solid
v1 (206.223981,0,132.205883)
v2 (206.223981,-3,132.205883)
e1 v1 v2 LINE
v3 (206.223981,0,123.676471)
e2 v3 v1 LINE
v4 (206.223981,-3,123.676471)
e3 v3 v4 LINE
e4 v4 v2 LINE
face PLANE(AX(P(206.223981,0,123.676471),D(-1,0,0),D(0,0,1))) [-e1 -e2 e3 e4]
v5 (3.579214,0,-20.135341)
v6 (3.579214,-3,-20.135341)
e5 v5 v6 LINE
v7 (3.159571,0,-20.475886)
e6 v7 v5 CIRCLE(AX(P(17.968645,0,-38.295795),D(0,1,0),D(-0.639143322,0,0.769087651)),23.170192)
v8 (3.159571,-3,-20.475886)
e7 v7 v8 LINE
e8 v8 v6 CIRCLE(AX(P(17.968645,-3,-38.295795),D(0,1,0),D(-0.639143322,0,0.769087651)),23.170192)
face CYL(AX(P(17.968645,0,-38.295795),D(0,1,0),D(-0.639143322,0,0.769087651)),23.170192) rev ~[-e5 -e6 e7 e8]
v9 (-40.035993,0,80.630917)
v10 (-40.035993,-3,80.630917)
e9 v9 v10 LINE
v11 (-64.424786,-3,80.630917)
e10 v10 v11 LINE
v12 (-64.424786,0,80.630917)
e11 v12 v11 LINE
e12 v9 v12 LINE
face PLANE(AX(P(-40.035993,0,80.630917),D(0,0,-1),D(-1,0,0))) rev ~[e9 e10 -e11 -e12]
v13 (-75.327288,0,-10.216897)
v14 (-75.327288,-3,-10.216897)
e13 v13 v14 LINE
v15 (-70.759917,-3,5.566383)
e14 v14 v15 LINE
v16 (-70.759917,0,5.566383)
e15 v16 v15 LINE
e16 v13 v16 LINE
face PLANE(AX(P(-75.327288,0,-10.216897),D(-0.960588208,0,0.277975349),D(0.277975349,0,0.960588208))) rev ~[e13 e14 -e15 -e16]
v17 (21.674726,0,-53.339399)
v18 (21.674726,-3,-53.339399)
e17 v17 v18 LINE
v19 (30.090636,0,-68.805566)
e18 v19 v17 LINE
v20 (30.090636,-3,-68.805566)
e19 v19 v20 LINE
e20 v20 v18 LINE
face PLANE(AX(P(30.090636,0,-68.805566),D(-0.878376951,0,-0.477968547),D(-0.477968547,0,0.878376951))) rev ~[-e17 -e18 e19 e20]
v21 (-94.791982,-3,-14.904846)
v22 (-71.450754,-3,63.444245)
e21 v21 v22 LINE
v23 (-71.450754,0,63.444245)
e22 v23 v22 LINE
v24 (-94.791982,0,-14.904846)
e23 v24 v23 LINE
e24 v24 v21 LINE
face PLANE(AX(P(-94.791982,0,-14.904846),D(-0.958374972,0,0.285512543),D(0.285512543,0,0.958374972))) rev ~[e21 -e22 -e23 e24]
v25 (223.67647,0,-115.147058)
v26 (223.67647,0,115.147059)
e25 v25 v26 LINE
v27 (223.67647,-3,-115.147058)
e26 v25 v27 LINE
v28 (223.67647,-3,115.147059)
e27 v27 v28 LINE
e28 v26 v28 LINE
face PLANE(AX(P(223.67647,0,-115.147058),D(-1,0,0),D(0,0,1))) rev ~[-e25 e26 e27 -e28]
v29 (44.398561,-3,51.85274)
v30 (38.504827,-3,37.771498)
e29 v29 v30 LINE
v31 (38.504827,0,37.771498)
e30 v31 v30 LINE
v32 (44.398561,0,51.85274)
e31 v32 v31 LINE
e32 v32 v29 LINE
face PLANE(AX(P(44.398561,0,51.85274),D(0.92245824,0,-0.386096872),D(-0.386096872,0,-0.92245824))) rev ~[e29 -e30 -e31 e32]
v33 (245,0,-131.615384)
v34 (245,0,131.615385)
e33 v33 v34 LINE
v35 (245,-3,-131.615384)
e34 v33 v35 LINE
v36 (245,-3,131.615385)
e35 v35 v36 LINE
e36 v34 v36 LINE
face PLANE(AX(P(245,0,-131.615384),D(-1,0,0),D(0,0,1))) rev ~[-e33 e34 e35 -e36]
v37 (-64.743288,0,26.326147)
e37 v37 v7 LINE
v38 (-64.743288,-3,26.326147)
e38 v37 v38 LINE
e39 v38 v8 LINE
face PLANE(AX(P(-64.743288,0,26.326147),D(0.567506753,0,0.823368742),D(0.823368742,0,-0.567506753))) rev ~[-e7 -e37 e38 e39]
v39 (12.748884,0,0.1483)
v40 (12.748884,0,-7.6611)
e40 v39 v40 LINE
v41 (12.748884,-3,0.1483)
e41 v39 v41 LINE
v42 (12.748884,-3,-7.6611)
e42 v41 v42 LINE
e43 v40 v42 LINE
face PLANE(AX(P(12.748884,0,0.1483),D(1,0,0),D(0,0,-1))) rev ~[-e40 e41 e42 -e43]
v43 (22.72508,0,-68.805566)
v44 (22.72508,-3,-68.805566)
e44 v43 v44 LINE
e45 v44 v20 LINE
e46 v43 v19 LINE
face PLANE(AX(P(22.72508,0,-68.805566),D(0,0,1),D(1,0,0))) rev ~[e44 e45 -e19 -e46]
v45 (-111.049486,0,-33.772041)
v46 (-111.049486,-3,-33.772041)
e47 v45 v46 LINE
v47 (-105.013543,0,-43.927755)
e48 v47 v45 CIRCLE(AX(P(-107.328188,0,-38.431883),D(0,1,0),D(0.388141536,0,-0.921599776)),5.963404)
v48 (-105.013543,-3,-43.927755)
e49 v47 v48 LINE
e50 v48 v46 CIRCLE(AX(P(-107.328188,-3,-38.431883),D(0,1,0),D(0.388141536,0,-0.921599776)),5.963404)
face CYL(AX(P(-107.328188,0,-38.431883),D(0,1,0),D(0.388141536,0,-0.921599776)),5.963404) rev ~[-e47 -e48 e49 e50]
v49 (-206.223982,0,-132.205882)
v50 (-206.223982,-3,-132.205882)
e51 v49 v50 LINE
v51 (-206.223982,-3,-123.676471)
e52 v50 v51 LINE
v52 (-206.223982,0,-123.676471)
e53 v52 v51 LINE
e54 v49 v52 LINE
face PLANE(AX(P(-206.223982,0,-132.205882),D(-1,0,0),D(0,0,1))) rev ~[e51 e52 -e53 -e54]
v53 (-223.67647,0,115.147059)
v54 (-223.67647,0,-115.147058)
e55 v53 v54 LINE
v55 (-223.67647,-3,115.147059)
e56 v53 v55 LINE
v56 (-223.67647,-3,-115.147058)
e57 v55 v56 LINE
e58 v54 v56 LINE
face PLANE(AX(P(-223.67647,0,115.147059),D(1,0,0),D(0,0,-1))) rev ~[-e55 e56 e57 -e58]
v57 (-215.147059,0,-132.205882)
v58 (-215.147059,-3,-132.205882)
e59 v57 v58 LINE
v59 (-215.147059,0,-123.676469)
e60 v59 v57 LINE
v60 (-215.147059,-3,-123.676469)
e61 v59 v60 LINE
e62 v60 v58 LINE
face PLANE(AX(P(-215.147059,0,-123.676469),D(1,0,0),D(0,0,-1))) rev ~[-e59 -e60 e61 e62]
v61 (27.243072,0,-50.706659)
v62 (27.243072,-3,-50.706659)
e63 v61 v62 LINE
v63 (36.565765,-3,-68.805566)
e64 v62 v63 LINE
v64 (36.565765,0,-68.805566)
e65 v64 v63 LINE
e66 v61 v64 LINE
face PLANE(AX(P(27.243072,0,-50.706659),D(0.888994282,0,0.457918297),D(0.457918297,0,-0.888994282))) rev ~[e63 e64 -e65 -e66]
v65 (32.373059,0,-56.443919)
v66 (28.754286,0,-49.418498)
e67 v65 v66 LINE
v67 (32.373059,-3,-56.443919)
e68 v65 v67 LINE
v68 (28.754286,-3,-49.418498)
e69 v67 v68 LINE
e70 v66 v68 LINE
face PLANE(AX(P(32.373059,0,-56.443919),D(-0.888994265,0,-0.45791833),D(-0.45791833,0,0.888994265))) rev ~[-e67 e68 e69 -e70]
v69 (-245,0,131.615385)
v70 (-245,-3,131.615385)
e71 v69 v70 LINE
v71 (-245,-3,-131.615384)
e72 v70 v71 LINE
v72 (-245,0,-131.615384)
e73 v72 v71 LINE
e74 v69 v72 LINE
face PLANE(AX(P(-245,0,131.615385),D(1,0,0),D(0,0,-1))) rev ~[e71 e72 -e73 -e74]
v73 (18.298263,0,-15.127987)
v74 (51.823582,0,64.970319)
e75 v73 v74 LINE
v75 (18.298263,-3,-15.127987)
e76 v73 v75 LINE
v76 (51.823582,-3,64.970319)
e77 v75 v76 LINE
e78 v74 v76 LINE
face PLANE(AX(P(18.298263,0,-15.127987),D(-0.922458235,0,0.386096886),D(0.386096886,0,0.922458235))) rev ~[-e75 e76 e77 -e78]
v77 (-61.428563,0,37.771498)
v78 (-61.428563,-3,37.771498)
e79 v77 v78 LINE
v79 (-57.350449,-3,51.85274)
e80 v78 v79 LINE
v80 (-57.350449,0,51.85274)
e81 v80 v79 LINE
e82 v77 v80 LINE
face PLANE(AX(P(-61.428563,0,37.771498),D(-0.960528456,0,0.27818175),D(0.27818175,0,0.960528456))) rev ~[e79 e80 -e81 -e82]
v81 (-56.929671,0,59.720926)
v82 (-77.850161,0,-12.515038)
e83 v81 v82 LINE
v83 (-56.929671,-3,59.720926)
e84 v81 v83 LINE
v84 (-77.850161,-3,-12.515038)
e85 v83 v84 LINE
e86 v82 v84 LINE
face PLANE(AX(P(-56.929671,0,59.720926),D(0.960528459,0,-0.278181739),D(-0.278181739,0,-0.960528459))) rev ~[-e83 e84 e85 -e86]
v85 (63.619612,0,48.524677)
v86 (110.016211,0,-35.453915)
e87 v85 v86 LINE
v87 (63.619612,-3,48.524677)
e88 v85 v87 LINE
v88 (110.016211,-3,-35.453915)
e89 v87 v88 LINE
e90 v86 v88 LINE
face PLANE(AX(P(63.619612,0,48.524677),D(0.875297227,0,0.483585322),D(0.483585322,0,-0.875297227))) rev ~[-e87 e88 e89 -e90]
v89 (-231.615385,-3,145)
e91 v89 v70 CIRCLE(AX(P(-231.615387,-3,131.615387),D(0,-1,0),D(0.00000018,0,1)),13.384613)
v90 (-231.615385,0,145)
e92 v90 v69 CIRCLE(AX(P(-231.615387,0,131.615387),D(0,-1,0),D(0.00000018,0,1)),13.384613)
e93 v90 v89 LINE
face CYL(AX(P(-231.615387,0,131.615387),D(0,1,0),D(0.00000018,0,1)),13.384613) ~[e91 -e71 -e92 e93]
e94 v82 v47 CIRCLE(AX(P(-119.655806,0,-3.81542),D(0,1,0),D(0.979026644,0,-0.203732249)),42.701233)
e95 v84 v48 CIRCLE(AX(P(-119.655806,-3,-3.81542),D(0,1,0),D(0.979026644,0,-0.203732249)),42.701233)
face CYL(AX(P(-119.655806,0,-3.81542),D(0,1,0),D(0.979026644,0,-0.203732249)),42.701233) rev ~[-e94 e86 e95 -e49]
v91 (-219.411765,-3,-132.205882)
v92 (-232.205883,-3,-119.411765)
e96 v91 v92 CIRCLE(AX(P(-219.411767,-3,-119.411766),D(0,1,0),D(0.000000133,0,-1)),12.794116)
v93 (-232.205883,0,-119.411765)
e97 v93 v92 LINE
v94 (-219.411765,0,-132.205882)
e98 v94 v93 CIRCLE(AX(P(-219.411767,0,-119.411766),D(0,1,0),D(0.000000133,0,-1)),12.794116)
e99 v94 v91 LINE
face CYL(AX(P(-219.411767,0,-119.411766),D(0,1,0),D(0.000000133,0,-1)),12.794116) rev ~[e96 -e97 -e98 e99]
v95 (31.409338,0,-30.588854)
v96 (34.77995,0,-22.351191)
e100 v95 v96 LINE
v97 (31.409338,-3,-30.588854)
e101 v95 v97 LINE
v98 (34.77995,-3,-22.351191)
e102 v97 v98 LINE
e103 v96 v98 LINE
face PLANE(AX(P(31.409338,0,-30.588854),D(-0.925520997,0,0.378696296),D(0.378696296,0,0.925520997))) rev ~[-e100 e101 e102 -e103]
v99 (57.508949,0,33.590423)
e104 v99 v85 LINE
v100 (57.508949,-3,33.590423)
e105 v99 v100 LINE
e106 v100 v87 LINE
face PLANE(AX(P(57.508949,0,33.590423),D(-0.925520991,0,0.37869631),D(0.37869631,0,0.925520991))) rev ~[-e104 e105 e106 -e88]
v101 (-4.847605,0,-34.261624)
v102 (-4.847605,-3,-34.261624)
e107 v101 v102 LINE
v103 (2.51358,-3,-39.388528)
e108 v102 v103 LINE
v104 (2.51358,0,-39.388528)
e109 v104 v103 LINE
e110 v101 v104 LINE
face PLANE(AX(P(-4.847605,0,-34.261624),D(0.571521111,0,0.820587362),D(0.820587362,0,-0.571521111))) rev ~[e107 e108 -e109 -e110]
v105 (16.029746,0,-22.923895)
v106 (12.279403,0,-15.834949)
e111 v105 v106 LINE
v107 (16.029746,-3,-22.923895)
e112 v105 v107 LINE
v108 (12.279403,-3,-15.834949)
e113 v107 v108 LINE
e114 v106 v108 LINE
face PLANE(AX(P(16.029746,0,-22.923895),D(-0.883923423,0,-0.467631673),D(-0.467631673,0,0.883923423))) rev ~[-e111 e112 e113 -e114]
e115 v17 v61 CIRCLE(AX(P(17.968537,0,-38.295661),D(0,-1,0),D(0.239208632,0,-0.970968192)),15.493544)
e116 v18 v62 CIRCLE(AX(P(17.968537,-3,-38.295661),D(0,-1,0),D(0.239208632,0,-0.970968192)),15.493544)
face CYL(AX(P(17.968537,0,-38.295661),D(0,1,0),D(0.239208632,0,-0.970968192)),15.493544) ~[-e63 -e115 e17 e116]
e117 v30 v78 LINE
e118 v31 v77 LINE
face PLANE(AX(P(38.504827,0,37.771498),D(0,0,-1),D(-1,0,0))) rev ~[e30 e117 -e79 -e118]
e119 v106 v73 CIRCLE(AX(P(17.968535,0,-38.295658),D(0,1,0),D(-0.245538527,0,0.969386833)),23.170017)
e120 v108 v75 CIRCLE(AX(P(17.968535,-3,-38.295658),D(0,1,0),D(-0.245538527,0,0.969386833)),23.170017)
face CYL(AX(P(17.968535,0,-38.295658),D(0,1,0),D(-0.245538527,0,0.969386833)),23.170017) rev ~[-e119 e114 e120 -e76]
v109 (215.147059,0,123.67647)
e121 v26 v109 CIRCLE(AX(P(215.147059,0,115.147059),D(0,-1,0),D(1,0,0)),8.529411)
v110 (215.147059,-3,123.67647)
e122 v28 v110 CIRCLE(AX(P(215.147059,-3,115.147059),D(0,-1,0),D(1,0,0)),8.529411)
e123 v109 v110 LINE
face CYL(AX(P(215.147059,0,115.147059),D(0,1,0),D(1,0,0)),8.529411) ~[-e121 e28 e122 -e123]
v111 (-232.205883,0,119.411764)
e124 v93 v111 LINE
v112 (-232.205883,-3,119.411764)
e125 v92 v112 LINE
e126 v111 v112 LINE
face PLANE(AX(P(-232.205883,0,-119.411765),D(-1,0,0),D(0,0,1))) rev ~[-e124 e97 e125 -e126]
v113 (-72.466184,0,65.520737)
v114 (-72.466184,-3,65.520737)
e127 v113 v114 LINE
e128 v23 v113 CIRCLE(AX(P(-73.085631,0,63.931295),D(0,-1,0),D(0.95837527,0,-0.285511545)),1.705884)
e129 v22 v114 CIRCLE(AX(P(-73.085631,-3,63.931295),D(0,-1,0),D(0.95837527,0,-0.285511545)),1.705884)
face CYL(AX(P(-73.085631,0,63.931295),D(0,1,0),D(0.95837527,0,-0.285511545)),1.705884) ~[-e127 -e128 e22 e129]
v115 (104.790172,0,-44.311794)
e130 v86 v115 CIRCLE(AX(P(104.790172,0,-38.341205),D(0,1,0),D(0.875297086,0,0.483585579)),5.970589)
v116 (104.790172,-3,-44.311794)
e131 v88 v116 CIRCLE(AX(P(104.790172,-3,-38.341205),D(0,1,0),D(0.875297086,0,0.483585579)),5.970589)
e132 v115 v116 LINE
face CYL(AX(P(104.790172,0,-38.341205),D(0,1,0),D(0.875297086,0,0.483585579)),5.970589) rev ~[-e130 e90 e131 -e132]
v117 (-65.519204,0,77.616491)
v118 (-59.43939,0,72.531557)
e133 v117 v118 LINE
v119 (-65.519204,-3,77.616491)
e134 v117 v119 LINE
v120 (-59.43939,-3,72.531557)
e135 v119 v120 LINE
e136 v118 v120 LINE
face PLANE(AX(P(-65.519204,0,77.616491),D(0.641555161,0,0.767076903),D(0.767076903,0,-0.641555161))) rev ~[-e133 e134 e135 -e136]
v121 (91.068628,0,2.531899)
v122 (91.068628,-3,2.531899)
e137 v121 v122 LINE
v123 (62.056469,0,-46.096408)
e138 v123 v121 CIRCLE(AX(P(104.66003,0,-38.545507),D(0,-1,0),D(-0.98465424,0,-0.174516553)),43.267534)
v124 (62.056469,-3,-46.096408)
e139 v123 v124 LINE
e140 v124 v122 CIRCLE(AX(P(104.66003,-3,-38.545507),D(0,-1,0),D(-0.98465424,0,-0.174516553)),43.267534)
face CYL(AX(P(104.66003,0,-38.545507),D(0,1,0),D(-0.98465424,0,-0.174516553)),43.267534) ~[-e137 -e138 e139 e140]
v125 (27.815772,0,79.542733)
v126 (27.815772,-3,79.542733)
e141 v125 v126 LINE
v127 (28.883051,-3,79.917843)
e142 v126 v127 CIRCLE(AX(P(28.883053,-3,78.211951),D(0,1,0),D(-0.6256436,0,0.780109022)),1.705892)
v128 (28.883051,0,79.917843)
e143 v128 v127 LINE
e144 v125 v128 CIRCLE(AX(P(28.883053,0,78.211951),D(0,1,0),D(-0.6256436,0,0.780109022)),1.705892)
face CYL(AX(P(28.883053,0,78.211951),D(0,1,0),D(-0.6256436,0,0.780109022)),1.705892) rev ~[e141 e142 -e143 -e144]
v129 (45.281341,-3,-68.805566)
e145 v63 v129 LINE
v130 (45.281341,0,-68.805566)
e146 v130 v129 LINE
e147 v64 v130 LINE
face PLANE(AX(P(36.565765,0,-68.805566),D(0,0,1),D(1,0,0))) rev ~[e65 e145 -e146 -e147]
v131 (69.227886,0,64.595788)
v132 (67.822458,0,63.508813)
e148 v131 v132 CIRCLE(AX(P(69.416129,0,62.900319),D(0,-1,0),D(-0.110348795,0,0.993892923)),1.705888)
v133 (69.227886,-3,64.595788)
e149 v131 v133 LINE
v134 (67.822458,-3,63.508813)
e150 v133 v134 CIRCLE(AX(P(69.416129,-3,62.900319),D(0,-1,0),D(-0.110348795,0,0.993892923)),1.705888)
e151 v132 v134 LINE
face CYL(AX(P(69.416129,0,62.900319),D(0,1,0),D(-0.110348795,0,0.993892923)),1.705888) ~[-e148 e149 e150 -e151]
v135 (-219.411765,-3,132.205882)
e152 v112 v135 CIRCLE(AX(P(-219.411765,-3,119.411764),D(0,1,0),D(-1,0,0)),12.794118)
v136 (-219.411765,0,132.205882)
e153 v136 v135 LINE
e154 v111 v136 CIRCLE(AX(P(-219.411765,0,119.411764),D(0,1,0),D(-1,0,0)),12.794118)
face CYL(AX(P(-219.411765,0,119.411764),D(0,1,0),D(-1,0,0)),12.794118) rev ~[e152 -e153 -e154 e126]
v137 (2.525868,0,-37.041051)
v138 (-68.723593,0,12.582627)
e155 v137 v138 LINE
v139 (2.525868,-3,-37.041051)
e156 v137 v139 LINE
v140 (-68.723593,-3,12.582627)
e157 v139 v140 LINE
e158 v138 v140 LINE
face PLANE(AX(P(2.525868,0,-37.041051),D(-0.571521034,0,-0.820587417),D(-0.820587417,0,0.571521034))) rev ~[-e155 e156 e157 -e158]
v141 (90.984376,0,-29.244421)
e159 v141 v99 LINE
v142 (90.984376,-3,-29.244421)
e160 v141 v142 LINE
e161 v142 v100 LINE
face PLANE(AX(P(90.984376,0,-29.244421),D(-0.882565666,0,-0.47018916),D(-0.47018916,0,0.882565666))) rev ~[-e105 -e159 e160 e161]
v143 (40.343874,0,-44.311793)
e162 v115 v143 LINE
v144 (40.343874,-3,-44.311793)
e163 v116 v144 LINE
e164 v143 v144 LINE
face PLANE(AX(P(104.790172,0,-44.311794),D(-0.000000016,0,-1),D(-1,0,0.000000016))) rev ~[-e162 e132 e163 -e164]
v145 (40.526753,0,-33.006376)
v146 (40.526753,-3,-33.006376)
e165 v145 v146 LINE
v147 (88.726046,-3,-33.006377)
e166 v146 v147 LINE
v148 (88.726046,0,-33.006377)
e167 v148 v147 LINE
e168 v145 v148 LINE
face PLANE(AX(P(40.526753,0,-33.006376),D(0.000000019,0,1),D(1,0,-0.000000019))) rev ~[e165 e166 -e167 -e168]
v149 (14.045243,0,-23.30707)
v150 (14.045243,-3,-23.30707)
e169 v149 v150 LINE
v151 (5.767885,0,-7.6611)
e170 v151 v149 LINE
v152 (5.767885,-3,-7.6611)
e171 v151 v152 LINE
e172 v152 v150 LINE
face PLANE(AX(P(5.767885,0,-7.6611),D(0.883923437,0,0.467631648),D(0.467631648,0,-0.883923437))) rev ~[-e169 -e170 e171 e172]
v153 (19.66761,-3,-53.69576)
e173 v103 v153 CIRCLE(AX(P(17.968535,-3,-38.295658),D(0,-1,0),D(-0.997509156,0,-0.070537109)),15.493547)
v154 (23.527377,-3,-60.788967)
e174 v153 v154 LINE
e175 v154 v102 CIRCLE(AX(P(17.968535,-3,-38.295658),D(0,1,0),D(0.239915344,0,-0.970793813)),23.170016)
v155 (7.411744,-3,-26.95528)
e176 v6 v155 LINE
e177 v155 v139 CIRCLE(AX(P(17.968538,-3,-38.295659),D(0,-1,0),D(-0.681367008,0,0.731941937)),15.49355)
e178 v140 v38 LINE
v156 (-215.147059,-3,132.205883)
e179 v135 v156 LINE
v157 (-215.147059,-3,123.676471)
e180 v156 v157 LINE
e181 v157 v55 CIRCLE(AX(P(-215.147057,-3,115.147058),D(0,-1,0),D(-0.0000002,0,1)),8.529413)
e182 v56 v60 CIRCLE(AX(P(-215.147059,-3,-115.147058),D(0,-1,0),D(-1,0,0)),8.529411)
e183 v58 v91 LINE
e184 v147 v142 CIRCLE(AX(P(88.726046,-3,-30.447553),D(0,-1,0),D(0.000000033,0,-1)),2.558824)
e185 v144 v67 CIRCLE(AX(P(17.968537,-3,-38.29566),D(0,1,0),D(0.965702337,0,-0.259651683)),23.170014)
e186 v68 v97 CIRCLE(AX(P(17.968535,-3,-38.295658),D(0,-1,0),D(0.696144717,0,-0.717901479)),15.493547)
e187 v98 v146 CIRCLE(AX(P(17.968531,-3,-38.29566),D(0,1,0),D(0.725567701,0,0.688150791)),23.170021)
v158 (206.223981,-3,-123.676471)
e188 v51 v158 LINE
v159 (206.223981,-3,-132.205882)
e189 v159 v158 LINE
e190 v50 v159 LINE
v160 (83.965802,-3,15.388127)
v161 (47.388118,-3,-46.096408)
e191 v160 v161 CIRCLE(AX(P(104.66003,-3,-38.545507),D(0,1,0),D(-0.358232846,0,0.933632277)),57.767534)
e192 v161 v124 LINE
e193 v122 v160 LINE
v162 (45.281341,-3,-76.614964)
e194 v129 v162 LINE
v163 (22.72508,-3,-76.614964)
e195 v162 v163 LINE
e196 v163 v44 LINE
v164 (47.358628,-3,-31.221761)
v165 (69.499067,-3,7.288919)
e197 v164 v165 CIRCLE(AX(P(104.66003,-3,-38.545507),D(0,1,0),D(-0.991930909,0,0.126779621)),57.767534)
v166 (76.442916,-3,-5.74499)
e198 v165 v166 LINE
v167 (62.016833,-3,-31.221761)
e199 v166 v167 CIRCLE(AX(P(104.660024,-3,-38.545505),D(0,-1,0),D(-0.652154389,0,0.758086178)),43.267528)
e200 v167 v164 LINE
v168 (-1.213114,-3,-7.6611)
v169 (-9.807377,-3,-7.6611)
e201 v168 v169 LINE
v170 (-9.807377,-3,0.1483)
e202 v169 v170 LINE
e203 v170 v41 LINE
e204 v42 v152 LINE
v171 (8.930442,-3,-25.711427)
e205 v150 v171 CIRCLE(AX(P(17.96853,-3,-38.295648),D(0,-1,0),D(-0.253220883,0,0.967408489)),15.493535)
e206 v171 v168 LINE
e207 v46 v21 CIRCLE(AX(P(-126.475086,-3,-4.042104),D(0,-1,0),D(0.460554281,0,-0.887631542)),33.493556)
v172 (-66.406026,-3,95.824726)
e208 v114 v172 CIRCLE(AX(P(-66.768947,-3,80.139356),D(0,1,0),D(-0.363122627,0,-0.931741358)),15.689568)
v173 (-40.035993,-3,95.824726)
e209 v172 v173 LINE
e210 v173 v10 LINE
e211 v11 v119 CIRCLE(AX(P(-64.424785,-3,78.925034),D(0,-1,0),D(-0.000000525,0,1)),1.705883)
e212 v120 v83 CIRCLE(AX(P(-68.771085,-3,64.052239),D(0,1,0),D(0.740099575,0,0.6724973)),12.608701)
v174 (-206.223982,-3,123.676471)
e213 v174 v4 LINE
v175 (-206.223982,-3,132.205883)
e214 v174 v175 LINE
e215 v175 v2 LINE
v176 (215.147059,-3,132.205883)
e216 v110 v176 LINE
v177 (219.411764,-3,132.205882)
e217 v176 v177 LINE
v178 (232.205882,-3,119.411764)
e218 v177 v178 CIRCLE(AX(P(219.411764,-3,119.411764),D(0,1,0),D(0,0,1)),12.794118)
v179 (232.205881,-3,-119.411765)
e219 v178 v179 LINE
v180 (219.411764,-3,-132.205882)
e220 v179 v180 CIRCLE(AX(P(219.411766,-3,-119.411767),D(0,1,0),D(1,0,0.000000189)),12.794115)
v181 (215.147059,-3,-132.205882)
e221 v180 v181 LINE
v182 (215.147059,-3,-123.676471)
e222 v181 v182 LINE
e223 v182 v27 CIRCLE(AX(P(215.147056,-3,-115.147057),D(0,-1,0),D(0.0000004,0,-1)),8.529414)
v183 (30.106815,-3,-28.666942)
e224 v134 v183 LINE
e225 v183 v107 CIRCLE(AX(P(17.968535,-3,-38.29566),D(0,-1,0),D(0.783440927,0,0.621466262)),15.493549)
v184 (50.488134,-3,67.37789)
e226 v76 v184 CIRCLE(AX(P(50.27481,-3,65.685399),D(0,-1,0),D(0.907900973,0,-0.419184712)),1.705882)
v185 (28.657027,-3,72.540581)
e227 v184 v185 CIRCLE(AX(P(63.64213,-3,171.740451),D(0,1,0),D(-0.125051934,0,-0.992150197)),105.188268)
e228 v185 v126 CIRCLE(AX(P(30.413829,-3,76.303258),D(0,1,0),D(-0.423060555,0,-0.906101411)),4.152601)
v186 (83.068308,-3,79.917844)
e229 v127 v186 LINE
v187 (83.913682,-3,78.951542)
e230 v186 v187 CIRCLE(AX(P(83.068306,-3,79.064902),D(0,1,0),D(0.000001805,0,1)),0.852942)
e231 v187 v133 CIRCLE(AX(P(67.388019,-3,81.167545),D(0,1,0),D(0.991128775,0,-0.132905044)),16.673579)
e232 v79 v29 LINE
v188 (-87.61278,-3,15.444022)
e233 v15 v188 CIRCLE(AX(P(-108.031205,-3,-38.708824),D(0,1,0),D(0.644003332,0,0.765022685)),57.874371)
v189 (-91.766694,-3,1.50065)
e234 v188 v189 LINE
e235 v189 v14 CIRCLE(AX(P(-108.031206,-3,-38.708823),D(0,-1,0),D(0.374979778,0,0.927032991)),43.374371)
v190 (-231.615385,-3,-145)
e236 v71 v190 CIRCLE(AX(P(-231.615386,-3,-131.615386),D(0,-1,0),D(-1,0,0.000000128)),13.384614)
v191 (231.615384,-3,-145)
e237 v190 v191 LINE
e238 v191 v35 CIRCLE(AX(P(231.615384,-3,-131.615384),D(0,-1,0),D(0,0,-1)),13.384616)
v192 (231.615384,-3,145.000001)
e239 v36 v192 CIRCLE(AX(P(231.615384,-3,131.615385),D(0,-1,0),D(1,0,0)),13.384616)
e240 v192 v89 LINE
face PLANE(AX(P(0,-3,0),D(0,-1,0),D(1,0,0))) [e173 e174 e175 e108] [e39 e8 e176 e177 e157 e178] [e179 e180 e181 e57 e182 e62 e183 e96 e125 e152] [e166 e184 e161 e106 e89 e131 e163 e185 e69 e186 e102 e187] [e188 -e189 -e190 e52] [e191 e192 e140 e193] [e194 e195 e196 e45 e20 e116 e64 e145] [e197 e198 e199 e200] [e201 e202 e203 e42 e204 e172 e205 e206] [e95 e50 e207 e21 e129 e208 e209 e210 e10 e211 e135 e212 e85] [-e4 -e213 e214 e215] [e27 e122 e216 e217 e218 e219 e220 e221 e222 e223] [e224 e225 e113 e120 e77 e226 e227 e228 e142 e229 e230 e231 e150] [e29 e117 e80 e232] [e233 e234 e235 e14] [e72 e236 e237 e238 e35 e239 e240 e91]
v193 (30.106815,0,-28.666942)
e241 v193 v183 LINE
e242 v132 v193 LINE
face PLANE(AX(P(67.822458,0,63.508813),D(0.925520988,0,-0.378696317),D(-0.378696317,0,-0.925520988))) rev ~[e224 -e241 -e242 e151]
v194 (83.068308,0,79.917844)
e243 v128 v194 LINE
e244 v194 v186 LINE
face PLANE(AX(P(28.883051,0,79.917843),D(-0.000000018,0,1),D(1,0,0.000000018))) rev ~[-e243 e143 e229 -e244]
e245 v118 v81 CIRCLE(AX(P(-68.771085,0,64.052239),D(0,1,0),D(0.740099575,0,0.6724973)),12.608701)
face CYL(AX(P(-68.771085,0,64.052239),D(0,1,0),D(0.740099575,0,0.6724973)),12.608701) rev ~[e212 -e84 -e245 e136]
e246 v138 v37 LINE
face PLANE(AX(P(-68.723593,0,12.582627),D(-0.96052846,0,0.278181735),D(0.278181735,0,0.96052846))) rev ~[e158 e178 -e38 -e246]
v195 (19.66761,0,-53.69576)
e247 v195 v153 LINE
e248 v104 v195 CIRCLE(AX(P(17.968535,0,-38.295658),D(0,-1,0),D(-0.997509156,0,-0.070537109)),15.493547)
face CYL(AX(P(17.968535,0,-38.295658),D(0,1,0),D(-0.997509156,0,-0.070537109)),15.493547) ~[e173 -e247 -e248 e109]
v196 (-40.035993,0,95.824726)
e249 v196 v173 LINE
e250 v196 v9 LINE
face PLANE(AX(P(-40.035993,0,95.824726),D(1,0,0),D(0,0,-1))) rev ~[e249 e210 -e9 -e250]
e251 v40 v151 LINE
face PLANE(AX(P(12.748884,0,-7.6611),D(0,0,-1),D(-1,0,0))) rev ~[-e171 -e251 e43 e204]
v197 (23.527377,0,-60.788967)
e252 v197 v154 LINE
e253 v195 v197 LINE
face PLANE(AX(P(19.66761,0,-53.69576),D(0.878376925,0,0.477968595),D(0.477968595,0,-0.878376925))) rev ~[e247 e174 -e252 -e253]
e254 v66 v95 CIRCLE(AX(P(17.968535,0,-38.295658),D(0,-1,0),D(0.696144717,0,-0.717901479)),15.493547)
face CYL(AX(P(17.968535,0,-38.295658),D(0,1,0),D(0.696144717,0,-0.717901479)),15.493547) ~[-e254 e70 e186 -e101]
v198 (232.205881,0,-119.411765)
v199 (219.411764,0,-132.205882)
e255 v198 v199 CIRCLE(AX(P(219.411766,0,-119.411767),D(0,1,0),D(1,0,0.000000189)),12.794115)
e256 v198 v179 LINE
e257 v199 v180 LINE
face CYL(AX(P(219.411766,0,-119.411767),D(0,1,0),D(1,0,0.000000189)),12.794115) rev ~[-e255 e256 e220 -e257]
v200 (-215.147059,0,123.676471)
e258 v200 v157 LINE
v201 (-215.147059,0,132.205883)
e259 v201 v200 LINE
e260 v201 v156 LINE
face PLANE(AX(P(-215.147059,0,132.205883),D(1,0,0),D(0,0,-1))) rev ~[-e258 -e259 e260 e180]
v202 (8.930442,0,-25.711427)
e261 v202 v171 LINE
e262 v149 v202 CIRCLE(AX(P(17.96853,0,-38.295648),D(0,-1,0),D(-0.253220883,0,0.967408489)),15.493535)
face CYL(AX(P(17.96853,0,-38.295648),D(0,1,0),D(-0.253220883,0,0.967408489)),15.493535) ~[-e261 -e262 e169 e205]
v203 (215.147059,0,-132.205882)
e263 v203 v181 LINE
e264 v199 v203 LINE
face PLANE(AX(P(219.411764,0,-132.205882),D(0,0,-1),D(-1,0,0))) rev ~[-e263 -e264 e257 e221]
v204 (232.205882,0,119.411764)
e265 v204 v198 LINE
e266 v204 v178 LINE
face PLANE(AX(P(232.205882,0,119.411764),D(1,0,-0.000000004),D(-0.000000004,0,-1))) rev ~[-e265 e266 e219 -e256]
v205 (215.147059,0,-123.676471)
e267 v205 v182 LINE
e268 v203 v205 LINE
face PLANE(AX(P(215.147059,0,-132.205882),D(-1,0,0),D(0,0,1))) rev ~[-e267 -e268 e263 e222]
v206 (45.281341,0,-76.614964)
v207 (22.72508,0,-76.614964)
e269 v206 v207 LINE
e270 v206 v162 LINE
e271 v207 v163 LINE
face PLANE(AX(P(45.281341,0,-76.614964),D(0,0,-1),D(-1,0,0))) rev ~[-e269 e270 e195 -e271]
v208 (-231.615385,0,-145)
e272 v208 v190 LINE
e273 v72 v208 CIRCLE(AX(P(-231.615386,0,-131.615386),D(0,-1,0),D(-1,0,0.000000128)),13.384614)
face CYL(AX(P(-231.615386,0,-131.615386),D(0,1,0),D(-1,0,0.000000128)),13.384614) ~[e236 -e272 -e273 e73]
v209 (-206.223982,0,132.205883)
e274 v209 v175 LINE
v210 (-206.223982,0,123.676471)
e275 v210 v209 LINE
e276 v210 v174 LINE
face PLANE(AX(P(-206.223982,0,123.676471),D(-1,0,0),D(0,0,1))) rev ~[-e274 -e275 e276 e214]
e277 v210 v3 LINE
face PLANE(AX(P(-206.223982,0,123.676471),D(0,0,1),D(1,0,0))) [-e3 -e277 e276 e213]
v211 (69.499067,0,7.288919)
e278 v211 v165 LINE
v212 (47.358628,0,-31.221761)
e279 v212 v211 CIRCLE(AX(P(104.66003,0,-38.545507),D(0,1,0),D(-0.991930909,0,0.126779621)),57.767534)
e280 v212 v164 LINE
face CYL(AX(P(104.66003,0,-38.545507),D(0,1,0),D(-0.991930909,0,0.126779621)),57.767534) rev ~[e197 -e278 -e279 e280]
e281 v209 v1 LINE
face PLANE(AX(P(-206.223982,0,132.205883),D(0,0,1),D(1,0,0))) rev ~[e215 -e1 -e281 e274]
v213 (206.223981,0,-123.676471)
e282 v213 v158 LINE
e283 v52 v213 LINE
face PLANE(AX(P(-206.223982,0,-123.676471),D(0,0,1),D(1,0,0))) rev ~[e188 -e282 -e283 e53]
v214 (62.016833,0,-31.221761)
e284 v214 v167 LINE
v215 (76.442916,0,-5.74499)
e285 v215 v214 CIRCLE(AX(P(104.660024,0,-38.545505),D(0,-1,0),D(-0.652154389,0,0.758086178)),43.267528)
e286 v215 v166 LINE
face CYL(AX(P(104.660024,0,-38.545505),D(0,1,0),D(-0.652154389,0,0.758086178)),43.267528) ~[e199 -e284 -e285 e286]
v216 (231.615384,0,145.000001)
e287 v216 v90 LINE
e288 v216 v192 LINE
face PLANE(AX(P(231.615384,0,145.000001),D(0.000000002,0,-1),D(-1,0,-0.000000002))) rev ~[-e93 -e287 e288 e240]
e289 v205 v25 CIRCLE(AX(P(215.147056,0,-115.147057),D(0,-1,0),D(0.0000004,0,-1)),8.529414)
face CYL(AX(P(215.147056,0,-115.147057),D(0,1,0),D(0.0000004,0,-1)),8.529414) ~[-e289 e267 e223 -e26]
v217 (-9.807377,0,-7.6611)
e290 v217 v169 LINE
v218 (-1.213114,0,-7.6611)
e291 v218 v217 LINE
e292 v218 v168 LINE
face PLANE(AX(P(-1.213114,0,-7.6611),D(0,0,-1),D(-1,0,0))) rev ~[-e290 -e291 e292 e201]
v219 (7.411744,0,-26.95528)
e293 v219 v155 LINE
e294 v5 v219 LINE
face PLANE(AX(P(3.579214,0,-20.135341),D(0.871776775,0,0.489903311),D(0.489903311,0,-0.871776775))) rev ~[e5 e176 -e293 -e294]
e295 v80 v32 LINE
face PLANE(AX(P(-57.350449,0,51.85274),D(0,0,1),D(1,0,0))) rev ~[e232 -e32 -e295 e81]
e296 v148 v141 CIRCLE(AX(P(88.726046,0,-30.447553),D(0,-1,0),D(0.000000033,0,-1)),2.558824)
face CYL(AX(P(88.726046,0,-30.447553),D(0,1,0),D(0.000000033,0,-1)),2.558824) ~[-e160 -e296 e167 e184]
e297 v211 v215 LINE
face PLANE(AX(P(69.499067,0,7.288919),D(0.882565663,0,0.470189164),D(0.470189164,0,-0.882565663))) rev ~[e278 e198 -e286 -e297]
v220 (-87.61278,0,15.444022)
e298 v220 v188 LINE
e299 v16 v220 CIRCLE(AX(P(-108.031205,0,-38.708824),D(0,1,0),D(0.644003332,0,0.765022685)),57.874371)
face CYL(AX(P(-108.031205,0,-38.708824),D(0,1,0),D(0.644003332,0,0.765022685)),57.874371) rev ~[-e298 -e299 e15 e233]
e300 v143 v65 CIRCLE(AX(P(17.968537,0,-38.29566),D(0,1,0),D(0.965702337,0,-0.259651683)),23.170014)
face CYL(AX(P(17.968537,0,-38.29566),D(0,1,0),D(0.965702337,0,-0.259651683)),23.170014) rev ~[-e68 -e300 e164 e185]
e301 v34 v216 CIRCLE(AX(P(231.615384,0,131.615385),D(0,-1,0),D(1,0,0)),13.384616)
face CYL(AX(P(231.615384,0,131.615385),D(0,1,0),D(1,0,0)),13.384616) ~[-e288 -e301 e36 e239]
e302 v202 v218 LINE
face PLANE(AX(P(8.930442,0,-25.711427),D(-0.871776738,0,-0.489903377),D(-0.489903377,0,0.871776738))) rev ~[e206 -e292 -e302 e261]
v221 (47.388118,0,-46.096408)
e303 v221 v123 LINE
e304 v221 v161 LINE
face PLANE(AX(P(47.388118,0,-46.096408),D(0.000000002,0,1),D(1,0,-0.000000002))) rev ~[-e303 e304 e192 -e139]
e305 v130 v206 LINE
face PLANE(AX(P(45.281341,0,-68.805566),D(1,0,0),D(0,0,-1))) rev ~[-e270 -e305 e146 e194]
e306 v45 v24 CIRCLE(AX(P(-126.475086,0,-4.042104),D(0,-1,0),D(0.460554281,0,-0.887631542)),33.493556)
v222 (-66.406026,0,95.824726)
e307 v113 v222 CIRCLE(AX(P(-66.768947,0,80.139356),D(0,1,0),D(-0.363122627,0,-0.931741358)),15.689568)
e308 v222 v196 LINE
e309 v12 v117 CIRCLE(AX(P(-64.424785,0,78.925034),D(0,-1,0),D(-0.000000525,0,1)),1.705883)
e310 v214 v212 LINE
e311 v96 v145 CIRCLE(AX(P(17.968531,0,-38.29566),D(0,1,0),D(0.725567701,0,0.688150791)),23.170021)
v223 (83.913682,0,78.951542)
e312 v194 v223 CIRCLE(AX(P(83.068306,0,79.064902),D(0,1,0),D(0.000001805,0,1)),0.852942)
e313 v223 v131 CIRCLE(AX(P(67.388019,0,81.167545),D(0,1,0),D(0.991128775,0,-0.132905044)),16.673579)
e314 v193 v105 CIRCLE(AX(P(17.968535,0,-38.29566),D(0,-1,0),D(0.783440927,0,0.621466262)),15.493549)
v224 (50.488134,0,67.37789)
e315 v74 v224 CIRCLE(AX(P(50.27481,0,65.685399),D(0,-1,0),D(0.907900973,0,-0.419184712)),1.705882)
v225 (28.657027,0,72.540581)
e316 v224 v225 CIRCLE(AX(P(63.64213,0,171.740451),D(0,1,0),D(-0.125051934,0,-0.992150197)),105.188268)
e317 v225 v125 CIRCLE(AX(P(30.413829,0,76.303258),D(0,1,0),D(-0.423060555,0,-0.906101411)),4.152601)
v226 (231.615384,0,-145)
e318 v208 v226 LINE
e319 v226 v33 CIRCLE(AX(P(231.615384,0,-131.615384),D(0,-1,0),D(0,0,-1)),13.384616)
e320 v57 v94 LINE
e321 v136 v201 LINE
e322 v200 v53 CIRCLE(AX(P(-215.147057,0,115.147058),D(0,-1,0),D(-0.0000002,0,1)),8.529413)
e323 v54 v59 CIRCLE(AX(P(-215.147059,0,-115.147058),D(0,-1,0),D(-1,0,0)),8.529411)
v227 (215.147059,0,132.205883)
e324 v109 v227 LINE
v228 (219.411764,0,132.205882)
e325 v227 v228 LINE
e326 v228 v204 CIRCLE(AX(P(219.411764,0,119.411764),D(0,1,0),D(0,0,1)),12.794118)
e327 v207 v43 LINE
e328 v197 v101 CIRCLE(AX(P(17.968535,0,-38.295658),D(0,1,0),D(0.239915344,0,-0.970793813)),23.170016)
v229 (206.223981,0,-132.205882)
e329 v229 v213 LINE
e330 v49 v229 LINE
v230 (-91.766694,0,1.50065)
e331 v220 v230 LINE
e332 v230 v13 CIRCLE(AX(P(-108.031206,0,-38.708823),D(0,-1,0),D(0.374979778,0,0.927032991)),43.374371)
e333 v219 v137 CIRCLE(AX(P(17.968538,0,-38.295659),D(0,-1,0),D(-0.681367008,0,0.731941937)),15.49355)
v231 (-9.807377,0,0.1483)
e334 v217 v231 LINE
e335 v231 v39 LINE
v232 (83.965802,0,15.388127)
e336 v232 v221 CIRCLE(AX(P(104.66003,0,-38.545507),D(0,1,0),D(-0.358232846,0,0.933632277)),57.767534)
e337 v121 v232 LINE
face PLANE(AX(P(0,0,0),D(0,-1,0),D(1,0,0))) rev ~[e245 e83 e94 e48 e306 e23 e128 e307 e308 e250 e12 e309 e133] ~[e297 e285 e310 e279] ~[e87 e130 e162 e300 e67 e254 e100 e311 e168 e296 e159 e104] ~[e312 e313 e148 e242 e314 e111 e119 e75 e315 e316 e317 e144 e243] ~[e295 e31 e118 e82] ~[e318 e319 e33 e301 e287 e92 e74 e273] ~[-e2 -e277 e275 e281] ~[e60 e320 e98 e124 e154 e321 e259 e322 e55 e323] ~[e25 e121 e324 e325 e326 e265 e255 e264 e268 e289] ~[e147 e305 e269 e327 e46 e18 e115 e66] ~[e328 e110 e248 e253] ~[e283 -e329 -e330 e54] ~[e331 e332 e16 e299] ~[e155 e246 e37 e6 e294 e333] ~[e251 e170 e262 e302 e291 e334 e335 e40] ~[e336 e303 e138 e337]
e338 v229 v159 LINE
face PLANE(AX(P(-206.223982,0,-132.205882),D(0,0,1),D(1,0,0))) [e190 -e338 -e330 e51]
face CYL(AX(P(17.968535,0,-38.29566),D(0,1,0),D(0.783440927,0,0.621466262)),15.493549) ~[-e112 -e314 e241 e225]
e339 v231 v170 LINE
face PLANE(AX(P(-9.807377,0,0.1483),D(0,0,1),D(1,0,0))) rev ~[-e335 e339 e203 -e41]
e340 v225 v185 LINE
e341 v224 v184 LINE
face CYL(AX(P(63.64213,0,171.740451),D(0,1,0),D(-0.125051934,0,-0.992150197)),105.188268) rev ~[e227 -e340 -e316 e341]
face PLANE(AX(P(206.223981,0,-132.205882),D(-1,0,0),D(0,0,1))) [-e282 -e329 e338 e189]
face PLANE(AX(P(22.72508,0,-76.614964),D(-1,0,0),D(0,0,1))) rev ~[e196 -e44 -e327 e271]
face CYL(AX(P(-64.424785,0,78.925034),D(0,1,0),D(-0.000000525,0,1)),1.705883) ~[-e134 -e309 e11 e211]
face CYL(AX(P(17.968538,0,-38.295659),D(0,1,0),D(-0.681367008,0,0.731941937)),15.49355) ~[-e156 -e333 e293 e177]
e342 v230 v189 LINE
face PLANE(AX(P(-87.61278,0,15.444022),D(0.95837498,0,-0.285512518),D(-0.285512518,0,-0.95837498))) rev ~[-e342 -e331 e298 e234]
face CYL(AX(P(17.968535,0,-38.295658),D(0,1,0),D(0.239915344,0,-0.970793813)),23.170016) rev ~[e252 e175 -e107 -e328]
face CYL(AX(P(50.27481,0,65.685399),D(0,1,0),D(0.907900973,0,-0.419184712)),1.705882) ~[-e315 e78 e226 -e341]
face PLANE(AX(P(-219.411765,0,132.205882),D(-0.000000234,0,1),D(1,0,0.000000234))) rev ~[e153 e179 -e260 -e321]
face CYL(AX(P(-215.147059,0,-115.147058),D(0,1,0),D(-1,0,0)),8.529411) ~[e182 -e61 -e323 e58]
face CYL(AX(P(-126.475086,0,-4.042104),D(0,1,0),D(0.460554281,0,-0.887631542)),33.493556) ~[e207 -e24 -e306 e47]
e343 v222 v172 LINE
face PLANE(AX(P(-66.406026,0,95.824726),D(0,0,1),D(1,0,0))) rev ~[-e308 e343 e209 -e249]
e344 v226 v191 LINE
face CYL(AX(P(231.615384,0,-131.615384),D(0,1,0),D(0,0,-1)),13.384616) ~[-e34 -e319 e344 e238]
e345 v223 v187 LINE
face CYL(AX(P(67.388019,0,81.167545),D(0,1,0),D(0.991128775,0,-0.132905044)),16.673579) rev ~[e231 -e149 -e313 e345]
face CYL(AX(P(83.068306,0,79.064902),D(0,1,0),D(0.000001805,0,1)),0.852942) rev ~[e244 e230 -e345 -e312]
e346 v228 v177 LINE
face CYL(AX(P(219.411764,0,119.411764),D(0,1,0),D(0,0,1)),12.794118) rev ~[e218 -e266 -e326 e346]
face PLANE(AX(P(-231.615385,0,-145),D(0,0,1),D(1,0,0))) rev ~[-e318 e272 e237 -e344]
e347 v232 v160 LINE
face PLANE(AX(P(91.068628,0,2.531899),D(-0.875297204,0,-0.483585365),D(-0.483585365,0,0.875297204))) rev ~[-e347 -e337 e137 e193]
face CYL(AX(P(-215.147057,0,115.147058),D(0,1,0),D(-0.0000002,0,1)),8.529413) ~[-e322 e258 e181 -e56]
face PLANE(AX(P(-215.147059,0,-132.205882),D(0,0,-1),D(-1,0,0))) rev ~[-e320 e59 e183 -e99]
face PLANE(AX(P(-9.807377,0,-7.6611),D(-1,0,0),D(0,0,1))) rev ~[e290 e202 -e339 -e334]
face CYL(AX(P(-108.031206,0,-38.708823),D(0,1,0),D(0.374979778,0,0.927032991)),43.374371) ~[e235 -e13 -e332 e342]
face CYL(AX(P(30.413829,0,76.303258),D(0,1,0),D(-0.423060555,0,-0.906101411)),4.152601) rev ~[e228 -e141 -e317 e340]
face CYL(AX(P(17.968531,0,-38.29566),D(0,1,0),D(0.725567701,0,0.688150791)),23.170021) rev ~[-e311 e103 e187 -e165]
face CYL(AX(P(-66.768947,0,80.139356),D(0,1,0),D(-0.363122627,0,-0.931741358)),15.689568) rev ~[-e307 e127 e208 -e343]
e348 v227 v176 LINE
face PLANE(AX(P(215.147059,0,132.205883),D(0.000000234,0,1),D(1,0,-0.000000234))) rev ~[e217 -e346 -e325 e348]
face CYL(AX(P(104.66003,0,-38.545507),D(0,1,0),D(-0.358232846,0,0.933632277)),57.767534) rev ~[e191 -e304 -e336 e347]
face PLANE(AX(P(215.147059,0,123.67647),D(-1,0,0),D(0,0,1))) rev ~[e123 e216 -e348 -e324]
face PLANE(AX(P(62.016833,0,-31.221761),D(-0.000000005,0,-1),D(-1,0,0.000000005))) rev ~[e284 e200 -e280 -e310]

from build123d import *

# Parameters (mm, degrees)
F0_W     = 412.447963
F0_H     = 8.529411
F0_H_2   = 8.529412
F1_DEPTH = 3


# Not quite as in the source:
# - ends of sketch curves that miss each other by under 0.0002 mm in the source are joined


with BuildPart() as f1:
    # F0 (on Front) → F1 (new body)
    with BuildSketch(Plane.XZ):
        with BuildLine():
            Line((-245, 131.615385), (-245, -131.615384))
            ThreePointArc((-245, -131.615384), (-241.0797377372, -141.0797367372), (-231.615385, -145))
            Line((-231.615385, -145), (231.615384, -145))
            ThreePointArc((231.615384, -145), (241.0797367372, -141.0797367372), (245, -131.615384))
            Line((245, -131.615384), (245, 131.615385))
            ThreePointArc((245, 131.615385), (241.0797367372, 141.0797377372), (231.615384, 145.000001))
            Line((231.615384, 145.000001), (-231.615385, 145))
            ThreePointArc((-231.615385, 145), (-241.0797377372, 141.0797377372), (-245, 131.615385))
        make_face()
        with BuildLine():
            ThreePointArc((-223.67647, -115.147058), (-221.1782633576, -121.1782623576), (-215.147059, -123.676469))
            Line((-215.147059, -123.676469), (-215.147059, -132.205882))
            Line((-215.147059, -132.205882), (-219.411765, -132.205882))
            ThreePointArc((-219.411765, -132.205882), (-228.4585725971, -128.4585725971), (-232.205883, -119.411765))
            Line((-232.205883, -119.411765), (-232.205883, 119.411764))
            ThreePointArc((-232.205883, 119.411764), (-228.4585725971, 128.4585715971), (-219.411765, 132.205882))
            Line((-219.411765, 132.205882), (-215.147059, 132.205883))
            Line((-215.147059, 132.205883), (-215.147059, 123.676471))
            ThreePointArc((-215.147059, 123.676471), (-221.1782633576, 121.1782633576), (-223.67647, 115.147059))
            Line((-223.67647, 115.147059), (-223.67647, -115.147058))
        make_face(mode=Mode.SUBTRACT)
        with BuildLine():
            ThreePointArc((-70.7599172527, 5.5663826998), (-137.2958198093, -88.6390266704), (-87.6127799718, 15.4440220749))
            Line((-87.6127799718, 15.4440220749), (-91.766694, 1.50065))
            ThreePointArc((-91.766694, 1.50065), (-133.2066284732, -74.0292729296), (-75.3272882753, -10.2168972398))
            Line((-75.3272882753, -10.2168972398), (-70.7599172527, 5.5663826998))
        make_face(mode=Mode.SUBTRACT)
        with BuildLine():
            Line((-68.723593, 12.582627), (-64.743288, 26.326147))
            Line((-64.743288, 26.326147), (3.159571, -20.475886))
            ThreePointArc((3.159571, -20.475886), (3.3683994767, -20.3043898267), (3.5792137936, -20.1353407395))
            Line((3.5792137936, -20.1353407395), (7.411744, -26.95528))
            ThreePointArc((7.411744, -26.95528), (4.0249471652, -31.5409295129), (2.5258681402, -37.0410509302))
            Line((2.5258681402, -37.0410509302), (-68.723593, 12.582627))
        make_face(mode=Mode.SUBTRACT)
        with Locations((-5e-07, -127.9411765)):
            Rectangle(F0_W, F0_H, mode=Mode.SUBTRACT)
        with BuildLine():
            Line((22.72508, -68.805566), (30.090636, -68.805566))
            Line((30.090636, -68.805566), (21.674726, -53.339399))
            ThreePointArc((21.674726, -53.339399), (24.591046355, -52.3025256725), (27.243072314, -50.7066594202))
            Line((27.243072314, -50.7066594202), (36.565765, -68.805566))
            Line((36.565765, -68.805566), (45.281341, -68.805566))
            Line((45.281341, -68.805566), (45.281341, -76.614964))
            Line((45.281341, -76.614964), (22.72508, -76.614964))
            Line((22.72508, -76.614964), (22.72508, -68.805566))
        make_face(mode=Mode.SUBTRACT)
        with BuildLine():
            Line((-4.847605, -34.261624), (2.51358, -39.388528))
            ThreePointArc((2.51358, -39.388528), (8.0448119147, -50.1939653909), (19.6676101132, -53.6957600257))
            Line((19.6676101132, -53.6957600257), (23.527377, -60.788967))
            ThreePointArc((23.527377, -60.788967), (2.1451797481, -55.2211156409), (-4.847605, -34.261624))
        make_face(mode=Mode.SUBTRACT)
        with BuildLine():
            ThreePointArc((83.96580189, 15.3881272867), (154.3064474066, -68.0805916135), (47.3881182197, -46.096407971))
            Line((47.3881182197, -46.096407971), (62.056469, -46.096408))
            ThreePointArc((62.056469, -46.096408), (141.8170821306, -60.7137946065), (91.0686279767, 2.5318990705))
            Line((91.0686279767, 2.5318990705), (83.96580189, 15.3881272867))
        make_face(mode=Mode.SUBTRACT)
        with BuildLine():
            Line((8.930442, -25.711427), (-1.213114, -7.6611))
            Line((-1.213114, -7.6611), (-9.807377, -7.6611))
            Line((-9.807377, -7.6611), (-9.807377, 0.1483))
            Line((-9.807377, 0.1483), (12.748884, 0.1483))
            Line((12.748884, 0.1483), (12.748884, -7.6611))
            Line((12.748884, -7.6611), (5.767885, -7.6611))
            Line((5.767885, -7.6611), (14.045243, -23.30707))
            ThreePointArc((14.045243, -23.30707), (11.3772825006, -24.2740536292), (8.930442, -25.711427))
        make_face(mode=Mode.SUBTRACT)
        with BuildLine():
            ThreePointArc((47.3586275037, -31.2217609366), (54.5791913728, -9.7531888086), (69.4990666913, 7.2889194025))
            Line((69.4990666913, 7.2889194025), (76.442916, -5.74499))
            ThreePointArc((76.442916, -5.74499), (67.0095000702, -17.2261004781), (62.0168330844, -31.2217610145))
            Line((62.0168330844, -31.2217610145), (47.3586275037, -31.2217609366))
        make_face(mode=Mode.SUBTRACT)
        with BuildLine():
            Line((90.984376, -29.244421), (57.508949, 33.590423))
            Line((57.508949, 33.590423), (63.619612, 48.524677))
            Line((63.619612, 48.524677), (110.016211, -35.453915))
            ThreePointArc((110.016211, -35.453915), (109.9324845309, -41.3751059281), (104.790172, -44.311794))
            Line((104.790172, -44.311794), (40.343874, -44.311793))
            ThreePointArc((40.343874, -44.311793), (37.3331086152, -51.0181961304), (32.3730594707, -56.443918593))
            Line((32.3730594707, -56.443918593), (28.754286, -49.418498))
            ThreePointArc((28.754286, -49.418498), (33.3103193803, -40.4589080248), (31.409337593, -30.5888542334))
            Line((31.409337593, -30.5888542334), (34.77995, -22.351191))
            ThreePointArc((34.77995, -22.351191), (38.3615541693, -27.2968191094), (40.5267526716, -33.006376077))
            Line((40.5267526716, -33.006376077), (88.726046, -33.006377))
            ThreePointArc((88.726046, -33.006377), (90.9199219225, -31.7645528859), (90.984376, -29.244421))
        make_face(mode=Mode.SUBTRACT)
        with BuildLine():
            Line((219.411764, -132.205882), (215.147059, -132.205882))
            Line((215.147059, -132.205882), (215.147059, -123.676471))
            ThreePointArc((215.147059, -123.676471), (221.1782633576, -121.1782623576), (223.67647, -115.147058))
            Line((223.67647, -115.147058), (223.67647, 115.147059))
            ThreePointArc((223.67647, 115.147059), (221.1782633576, 121.1782633576), (215.147059, 123.67647))
            Line((215.147059, 123.67647), (215.147059, 132.205883))
            Line((215.147059, 132.205883), (219.411764, 132.205882))
            ThreePointArc((219.411764, 132.205882), (228.4585715971, 128.4585715971), (232.205882, 119.411764))
            Line((232.205882, 119.411764), (232.205881, -119.411765))
            ThreePointArc((232.205881, -119.411765), (228.4585715971, -128.4585725971), (219.411764, -132.205882))
        make_face(mode=Mode.SUBTRACT)
        with BuildLine():
            ThreePointArc((-72.4661841519, 65.5207366103), (-82.1538966479, 83.216021136), (-66.4060260229, 95.8247260113))
            Line((-66.4060260229, 95.8247260113), (-40.035993, 95.824726))
            Line((-40.035993, 95.824726), (-40.035993, 80.630917))
            Line((-40.035993, 80.630917), (-64.424786, 80.630917))
            ThreePointArc((-64.424786, 80.630917), (-66.0282591874, 79.5071913113), (-65.5192035969, 77.616491482))
            Line((-65.5192035969, 77.616491482), (-59.43939, 72.531557))
            ThreePointArc((-59.43939, 72.531557), (-56.3975970197, 66.4763179948), (-56.9296708586, 59.7209263141))
            Line((-56.9296708586, 59.7209263141), (-77.850161, -12.515038))
            ThreePointArc((-77.850161, -12.515038), (-87.3559409811, -31.7459411903), (-105.0135430166, -43.9277549547))
            ThreePointArc((-105.0135430166, -43.9277549547), (-112.4545221205, -41.478665578), (-111.0494858176, -33.7720412284))
            ThreePointArc((-111.0494858176, -33.7720412284), (-101.1018664771, -25.9057272999), (-94.7919815143, -14.9048461665))
            Line((-94.7919815143, -14.9048461665), (-71.450754, 63.444245))
            ThreePointArc((-71.450754, 63.444245), (-71.5531660844, 64.6806886283), (-72.4661841519, 65.5207366103))
        make_face(mode=Mode.SUBTRACT)
        Polygon((-61.428563, 37.771498), (-57.350449, 51.85274), (44.398561, 51.85274), (38.504827, 37.771498), align=None, mode=Mode.SUBTRACT)
        with BuildLine():
            ThreePointArc((12.2794031528, -15.8349486032), (15.2656197234, -15.2838363253), (18.2982629962, -15.1279872662))
            Line((18.2982629962, -15.1279872662), (51.823582, 64.970319))
            ThreePointArc((51.823582, 64.970319), (51.7665690353, 66.512857989), (50.4881340177, 67.3778901407))
            ThreePointArc((50.4881340177, 67.3778901407), (39.4345578147, 69.3755880777), (28.6570272111, 72.5405805985))
            ThreePointArc((28.6570272111, 72.5405805985), (26.2908771018, 75.8079169957), (27.8157723755, 79.5427327786))
            ThreePointArc((27.8157723755, 79.5427327786), (28.3174115009, 79.8213352122), (28.883051, 79.917843))
            Line((28.883051, 79.917843), (83.068308, 79.917844))
            ThreePointArc((83.068308, 79.917844), (83.7102572475, 79.6265153128), (83.9136824011, 78.9515420803))
            ThreePointArc((83.9136824011, 78.9515420803), (79.0432795601, 69.2443269594), (69.2278859862, 64.5957881246))
            ThreePointArc((69.2278859862, 64.5957881246), (68.3724892885, 64.249714451), (67.8224577861, 63.5088130817))
            Line((67.8224577861, 63.5088130817), (30.106815, -28.666942))
            ThreePointArc((30.106815, -28.666942), (23.8211455462, -23.950033286), (16.0297460076, -22.92389506))
            Line((16.0297460076, -22.92389506), (12.2794031528, -15.8349486032))
        make_face(mode=Mode.SUBTRACT)
        with Locations((-5e-07, 127.941177)):
            Rectangle(F0_W, F0_H_2, mode=Mode.SUBTRACT)
    extrude(amount=F1_DEPTH)


solid = f1.part
